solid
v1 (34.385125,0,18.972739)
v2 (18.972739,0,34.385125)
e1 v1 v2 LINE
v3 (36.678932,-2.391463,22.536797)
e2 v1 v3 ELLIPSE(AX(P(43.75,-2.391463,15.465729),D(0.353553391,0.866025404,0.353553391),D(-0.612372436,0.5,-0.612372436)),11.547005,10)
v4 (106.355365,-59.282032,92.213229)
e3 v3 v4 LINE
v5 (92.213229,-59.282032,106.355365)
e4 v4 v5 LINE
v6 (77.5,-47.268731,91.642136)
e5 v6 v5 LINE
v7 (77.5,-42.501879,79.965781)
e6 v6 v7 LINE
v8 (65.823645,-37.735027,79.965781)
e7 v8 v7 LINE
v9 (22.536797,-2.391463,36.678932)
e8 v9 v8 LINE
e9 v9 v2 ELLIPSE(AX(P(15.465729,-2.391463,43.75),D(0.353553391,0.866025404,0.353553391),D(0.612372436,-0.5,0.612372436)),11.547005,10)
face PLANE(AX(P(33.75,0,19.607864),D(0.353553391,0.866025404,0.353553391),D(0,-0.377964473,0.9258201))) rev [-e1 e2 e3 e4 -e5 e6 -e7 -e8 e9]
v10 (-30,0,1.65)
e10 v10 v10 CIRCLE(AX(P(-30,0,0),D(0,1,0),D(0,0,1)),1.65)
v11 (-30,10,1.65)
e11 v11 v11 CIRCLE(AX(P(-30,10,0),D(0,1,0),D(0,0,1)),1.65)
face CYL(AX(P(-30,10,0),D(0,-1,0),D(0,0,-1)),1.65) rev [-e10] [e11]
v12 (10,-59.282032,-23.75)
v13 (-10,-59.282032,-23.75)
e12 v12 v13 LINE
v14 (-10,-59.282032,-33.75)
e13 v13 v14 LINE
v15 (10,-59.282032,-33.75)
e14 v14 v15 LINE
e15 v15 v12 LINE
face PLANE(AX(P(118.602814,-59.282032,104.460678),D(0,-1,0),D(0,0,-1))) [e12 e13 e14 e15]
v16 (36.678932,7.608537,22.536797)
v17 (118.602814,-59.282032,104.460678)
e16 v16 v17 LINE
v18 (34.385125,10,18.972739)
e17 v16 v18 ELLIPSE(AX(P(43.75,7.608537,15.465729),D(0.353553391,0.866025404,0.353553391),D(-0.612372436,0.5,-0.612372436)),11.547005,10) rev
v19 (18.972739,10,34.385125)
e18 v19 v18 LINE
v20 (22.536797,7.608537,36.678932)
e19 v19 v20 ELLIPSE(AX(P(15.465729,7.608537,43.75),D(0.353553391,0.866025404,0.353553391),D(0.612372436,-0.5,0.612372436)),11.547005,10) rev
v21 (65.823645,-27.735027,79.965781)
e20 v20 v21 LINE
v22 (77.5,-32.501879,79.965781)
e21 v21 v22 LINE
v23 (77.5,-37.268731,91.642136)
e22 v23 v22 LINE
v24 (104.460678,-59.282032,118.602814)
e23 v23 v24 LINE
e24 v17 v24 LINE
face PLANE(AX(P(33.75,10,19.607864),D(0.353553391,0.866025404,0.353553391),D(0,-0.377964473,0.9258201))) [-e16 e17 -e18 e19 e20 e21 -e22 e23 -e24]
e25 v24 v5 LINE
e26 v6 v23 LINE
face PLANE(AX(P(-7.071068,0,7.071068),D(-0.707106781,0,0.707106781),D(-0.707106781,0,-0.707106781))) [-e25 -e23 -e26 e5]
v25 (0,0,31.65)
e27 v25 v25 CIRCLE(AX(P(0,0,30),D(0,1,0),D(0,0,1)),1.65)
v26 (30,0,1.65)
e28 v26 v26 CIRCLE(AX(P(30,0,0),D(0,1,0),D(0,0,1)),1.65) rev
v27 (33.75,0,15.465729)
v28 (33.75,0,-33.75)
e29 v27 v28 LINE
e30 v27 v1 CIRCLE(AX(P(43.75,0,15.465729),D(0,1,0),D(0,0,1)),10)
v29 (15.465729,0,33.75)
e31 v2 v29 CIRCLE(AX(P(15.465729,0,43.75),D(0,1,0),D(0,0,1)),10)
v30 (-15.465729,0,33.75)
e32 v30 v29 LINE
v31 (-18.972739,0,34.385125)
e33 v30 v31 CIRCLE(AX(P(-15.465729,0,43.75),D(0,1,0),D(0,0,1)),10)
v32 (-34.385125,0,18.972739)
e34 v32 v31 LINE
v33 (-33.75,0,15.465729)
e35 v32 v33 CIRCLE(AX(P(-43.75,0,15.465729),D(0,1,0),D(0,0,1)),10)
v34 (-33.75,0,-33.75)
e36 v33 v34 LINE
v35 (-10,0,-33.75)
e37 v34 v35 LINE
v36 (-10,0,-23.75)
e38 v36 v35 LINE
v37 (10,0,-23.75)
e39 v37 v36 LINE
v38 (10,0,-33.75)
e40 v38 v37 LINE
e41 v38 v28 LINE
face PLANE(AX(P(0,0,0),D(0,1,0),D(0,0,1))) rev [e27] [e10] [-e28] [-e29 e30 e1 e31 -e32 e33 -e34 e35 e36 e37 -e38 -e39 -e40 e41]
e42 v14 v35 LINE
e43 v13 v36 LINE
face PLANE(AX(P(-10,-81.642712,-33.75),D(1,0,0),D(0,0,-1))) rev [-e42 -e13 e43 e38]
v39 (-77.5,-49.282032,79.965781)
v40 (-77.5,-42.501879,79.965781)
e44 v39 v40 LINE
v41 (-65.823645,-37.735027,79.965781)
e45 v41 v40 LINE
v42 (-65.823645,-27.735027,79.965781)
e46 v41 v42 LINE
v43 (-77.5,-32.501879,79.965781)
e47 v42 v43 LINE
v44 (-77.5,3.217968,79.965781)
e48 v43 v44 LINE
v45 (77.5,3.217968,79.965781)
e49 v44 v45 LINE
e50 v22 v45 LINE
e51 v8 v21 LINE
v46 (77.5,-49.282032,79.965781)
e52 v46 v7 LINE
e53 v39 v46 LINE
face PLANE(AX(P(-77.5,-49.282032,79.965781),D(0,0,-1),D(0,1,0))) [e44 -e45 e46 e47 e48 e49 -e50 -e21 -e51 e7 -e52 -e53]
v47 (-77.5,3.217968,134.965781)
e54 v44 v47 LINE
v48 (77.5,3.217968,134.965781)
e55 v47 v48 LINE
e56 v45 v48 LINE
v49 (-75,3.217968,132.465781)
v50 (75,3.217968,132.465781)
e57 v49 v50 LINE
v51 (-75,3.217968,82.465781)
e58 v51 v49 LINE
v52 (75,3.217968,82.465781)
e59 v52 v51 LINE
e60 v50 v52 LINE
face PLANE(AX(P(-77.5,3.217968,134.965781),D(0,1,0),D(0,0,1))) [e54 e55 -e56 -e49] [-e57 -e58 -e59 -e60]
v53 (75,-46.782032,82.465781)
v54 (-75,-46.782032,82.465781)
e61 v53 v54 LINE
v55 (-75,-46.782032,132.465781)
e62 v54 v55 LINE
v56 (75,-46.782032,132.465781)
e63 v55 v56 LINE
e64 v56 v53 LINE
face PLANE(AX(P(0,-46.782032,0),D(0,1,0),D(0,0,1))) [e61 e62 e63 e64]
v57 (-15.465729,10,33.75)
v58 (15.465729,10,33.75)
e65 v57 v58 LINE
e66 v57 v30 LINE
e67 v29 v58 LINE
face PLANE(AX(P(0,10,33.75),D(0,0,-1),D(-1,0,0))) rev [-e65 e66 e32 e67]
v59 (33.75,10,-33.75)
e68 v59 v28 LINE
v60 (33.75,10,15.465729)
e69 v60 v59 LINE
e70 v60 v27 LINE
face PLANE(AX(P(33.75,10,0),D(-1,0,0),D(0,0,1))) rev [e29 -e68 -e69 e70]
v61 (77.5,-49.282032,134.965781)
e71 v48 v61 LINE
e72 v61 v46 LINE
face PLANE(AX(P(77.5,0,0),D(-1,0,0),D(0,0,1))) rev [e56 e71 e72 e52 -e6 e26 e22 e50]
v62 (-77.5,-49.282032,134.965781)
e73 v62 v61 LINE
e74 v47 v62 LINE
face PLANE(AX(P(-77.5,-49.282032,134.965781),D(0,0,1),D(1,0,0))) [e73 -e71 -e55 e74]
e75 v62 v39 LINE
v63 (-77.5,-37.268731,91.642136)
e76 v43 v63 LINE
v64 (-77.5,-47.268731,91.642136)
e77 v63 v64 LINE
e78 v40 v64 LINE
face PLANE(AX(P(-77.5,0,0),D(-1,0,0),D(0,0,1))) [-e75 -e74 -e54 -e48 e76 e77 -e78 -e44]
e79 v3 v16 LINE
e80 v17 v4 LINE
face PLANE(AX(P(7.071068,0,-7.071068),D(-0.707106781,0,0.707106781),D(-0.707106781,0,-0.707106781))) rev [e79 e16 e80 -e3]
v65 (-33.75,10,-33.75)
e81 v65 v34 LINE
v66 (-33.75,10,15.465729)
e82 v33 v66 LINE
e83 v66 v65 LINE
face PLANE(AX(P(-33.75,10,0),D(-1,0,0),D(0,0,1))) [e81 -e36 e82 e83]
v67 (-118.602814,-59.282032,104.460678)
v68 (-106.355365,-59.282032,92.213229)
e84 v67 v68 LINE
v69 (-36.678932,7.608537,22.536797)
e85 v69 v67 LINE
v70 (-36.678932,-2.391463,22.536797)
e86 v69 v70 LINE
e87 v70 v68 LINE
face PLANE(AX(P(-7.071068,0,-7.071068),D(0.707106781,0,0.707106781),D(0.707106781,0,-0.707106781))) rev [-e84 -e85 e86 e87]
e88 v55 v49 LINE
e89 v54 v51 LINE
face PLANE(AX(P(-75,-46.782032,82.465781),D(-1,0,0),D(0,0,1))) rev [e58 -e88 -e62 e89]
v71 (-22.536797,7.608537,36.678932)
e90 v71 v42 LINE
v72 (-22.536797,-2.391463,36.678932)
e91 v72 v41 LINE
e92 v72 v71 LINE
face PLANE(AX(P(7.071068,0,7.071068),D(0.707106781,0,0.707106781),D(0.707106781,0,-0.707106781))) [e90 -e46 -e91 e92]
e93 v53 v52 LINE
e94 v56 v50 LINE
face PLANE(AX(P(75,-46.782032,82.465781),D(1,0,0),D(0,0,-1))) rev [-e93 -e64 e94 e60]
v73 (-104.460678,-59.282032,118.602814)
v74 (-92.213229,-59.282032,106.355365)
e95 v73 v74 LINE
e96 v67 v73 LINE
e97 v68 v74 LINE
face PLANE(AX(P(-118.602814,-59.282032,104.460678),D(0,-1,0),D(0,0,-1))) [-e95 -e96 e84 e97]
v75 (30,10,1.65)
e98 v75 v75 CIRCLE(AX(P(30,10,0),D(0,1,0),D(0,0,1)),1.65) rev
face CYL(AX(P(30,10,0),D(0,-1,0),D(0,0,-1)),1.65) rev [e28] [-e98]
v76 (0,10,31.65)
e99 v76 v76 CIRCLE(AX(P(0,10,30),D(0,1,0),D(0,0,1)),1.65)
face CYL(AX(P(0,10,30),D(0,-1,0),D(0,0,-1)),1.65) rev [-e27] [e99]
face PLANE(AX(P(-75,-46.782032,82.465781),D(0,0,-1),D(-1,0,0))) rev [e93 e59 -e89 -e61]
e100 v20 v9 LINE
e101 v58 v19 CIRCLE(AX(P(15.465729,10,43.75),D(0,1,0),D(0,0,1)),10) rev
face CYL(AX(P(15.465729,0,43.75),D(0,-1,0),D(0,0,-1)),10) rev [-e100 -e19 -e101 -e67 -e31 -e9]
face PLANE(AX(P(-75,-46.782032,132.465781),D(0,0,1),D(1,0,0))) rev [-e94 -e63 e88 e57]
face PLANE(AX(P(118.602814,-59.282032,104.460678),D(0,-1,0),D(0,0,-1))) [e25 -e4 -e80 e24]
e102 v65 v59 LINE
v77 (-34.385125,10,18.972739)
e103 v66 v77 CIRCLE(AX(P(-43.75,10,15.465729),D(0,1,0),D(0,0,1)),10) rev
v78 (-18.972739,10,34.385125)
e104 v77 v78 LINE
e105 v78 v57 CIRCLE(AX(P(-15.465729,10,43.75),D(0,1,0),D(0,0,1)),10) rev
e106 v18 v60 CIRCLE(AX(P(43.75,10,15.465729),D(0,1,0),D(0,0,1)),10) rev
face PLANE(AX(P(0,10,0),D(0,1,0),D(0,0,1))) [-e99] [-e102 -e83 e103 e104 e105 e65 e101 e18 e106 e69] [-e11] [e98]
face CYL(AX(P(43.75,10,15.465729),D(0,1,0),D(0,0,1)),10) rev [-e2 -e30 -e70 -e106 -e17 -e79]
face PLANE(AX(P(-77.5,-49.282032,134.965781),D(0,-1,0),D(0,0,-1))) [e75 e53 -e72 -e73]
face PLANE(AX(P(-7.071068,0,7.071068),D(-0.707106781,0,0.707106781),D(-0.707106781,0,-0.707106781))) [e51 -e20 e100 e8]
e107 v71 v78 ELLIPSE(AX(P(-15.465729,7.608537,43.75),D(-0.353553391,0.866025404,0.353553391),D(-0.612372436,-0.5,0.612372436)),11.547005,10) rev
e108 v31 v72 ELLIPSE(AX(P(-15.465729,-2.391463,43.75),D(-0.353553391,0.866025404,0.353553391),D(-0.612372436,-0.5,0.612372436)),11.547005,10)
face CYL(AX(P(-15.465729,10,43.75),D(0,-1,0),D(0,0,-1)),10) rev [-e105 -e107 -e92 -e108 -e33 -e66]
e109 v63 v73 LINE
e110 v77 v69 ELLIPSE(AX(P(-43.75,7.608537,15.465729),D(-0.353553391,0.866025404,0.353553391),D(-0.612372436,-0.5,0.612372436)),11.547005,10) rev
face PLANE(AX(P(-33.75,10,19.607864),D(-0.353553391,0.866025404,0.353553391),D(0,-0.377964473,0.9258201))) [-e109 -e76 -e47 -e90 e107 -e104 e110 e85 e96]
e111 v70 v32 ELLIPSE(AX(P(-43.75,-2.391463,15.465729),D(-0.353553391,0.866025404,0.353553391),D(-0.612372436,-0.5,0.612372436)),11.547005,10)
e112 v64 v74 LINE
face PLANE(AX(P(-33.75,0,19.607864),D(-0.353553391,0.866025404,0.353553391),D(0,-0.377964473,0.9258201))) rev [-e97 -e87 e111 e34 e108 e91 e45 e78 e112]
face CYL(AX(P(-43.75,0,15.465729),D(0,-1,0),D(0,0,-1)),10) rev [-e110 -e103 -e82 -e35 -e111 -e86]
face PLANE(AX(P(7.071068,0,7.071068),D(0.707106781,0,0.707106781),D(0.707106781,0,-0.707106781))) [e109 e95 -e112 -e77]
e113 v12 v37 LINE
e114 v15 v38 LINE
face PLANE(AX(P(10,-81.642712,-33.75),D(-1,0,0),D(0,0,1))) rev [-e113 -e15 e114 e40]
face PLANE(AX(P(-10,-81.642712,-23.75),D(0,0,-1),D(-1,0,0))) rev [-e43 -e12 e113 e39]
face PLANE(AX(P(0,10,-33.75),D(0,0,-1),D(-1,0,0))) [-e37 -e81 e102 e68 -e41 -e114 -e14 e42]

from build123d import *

# Parameters (mm, degrees)
SKETCH2_W                = 67.5
SKETCH2_H                = 67.5
SKETCH2_R                = 1.65
BOSS_EXTRUDE3_DEPTH      = 10
BOSS_EXTRUDE6_DEPTH      = 10
CUT_EXTRUDE2_DEPTH       = 10
CUT_EXTRUDE3_DEPTH       = 10
SKETCH13_W               = 20
SKETCH13_H               = 10
BOSS_EXTRUDE8_DEPTH      = 59.282032303
BOSS_EXTRUDE9_DEPTH      = 77.5
BOSS_EXTRUDE9_DEPTH_BACK = 77.5
SKETCH14_W               = 55
SKETCH14_H               = 52.5
SKETCH15_W               = 150
SKETCH15_H               = 50
CUT_EXTRUDE4_DEPTH       = 50
FILLET1_R                = 10


with BuildPart() as part:
    # Sketch2 → Boss-Extrude3 (new body)
    with BuildSketch(Plane(origin=(0, 0, 0), x_dir=(1, 0, 0), z_dir=(0, 1, 0))):
        Rectangle(SKETCH2_W, SKETCH2_H)
        with Locations(Location((-30, 0, 0), (0, 0, 270))):
            Circle(SKETCH2_R, mode=Mode.SUBTRACT)
        with Locations(Location((30, 0, 0), (0, 0, 270))):
            Circle(SKETCH2_R, mode=Mode.SUBTRACT)
        with Locations(Location((0, -30, 0), (0, 0, 270))):
            Circle(SKETCH2_R, mode=Mode.SUBTRACT)
    extrude(amount=BOSS_EXTRUDE3_DEPTH)


with BuildPart() as body_2:
    # Sketch5 → Boss-Extrude6 (new, symmetric)
    with BuildSketch(Plane(origin=(0, 0, 0), x_dir=(0.7071067811865476, 0, -0.7071067811865476), z_dir=(0.7071067811865476, 0, 0.7071067811865476))):
        Polygon((-37.72970773, 10), (-157.72970773, -59.282032303), (-140.409199654, -59.282032303), (-37.72970773, 0), align=None)
    boss_extrude6 = extrude(amount=BOSS_EXTRUDE6_DEPTH, both=True)


with BuildPart() as part_1:
    add(part.part)

    # Mirror3: Boss-Extrude6 across plane
    add(boss_extrude6.mirror(Plane(origin=(0, 0, 0), x_dir=(0, 0, 1), z_dir=(1, 0, 0))))

    # Sketch11 → Cut-Extrude2 (cut)
    with BuildSketch(Plane(origin=(9.731595226, 23.837442686, 9.731595226), x_dir=(0.9259415151999266, -0.2703581015304675, -0.2637021186227093), z_dir=(0.35355339059327223, 0.8660254037844399, 0.3535533905932725))):
        Polygon((6.552208132, -28.687416212), (23.376309745, -17.873092151), (23.376309745, -36.367082054), align=None)
    extrude(amount=CUT_EXTRUDE2_DEPTH, mode=Mode.SUBTRACT)

    # Sketch12 → Cut-Extrude3 (cut)
    with BuildSketch(Plane(origin=(-9.731595226, 23.837442686, 9.731595226), x_dir=(0.9259415151999266, 0.2703581015304675, 0.2637021186227093), z_dir=(-0.35355339059327223, 0.8660254037844399, 0.3535533905932725))):
        Polygon((-98.300144639, -134.433887296), (-81.476043026, -145.248211357), (-6.552208132, -28.687416212), (-23.376309745, -17.873092151), align=None)
    extrude(amount=CUT_EXTRUDE3_DEPTH, mode=Mode.SUBTRACT)

    # Sketch13 → Boss-Extrude8 (add)
    with BuildSketch(Plane.XZ):
        with Locations((0, -28.75)):
            Rectangle(SKETCH13_W, SKETCH13_H)
    extrude(amount=BOSS_EXTRUDE8_DEPTH)

    add(body_2.part)  # Boss-Extrude9 merges body 2
    # Sketch14 → Boss-Extrude9 (add, two sides: drawn at the far end of the back side and taken through both)
    with BuildSketch(Plane(origin=(0, 0, 0), x_dir=(0, 0, -1), z_dir=(1, 0, 0)).offset(-BOSS_EXTRUDE9_DEPTH_BACK)):
        with Locations((-107.465780691, -23.032032303)):
            Rectangle(SKETCH14_W, SKETCH14_H)
    extrude(amount=BOSS_EXTRUDE9_DEPTH + BOSS_EXTRUDE9_DEPTH_BACK)

    # Sketch15 → Cut-Extrude4 (cut)
    with BuildSketch(Plane(origin=(0, 3.217967697, 0), x_dir=(1, 0, 0), z_dir=(0, 1, 0))):
        with Locations((0, -107.465780691)):
            Rectangle(SKETCH15_W, SKETCH15_H)
    extrude(amount=-CUT_EXTRUDE4_DEPTH, mode=Mode.SUBTRACT)

    # Fillet1
    # the kernel refuses this fillet: 10 mm, written as the material it adds along each edge
    with BuildSketch(Plane(origin=(-19.607864376, 0, 33.75), x_dir=(-0.7071067811865471, 0, 0.7071067811865479), z_dir=(0, 1, 0))) as fillet1_piece_1_section:
        with BuildLine():
            CenterArc((FILLET1_R * 0.414213562373, FILLET1_R), FILLET1_R, 225, 45)
            Line((-FILLET1_R * 0.292893218813, FILLET1_R * 0.292893218813), (0, 0))
            Line((0, 0), (FILLET1_R * 0.414213562373, 0))
        make_face()
    fillet1_piece_1 = extrude(amount=10, mode=Mode.PRIVATE)
    fillet1_piece_1 = split(fillet1_piece_1, bisect_by=Plane(origin=(-17.351540007, 0.866448536, 33.883967569), z_dir=(0.3535533905932724, -0.8660254037844399, -0.3535533905932724)), keep=Keep.TOP, mode=Mode.PRIVATE)
    add(fillet1_piece_1)
    with BuildSketch(Plane(origin=(-19.607864376, -10.355339059, 33.75), x_dir=(-0.7071067811865475, 0, 0.7071067811865475), z_dir=(0, 1, 0))) as fillet1_piece_2_section:
        with BuildLine():
            CenterArc((FILLET1_R * 0.414213562373, FILLET1_R), FILLET1_R, 225, 45)
            Line((-FILLET1_R * 0.292893218813, FILLET1_R * 0.292893218813), (0, 0))
            Line((0, 0), (FILLET1_R * 0.414213562373, 0))
        make_face()
    fillet1_piece_2 = extrude(amount=20.355339059, mode=Mode.PRIVATE)
    fillet1_piece_2 = split(fillet1_piece_2, bisect_by=Plane(origin=(-21.014554375, -1.158148748, 35.180183481), z_dir=(-0.3535533905932724, 0.8660254037844399, 0.3535533905932724)), keep=Keep.TOP, mode=Mode.PRIVATE)
    fillet1_piece_2 = split(fillet1_piece_2, bisect_by=Plane(origin=(-21.217188194, 0, 35.382817301), z_dir=(0, -1, 0)), keep=Keep.TOP, mode=Mode.PRIVATE)
    add(fillet1_piece_2)
    with BuildSketch(Plane(origin=(-19.607864376, 0, 33.75), x_dir=(-0.7071067811865471, 0, 0.7071067811865479), z_dir=(0, 1, 0))) as fillet1_piece_3_section:
        with BuildLine():
            CenterArc((FILLET1_R * 0.414213562373, FILLET1_R), FILLET1_R, 225, 45)
            Line((-FILLET1_R * 0.292893218813, FILLET1_R * 0.292893218813), (0, 0))
            Line((0, 0), (FILLET1_R * 0.414213562373, 0))
        make_face()
    fillet1_piece_3 = extrude(amount=10, mode=Mode.PRIVATE)
    fillet1_piece_3 = split(fillet1_piece_3, bisect_by=Plane(origin=(-20.84268256, 8.638165162, 35.850982283), z_dir=(0.3535533905932724, -0.8660254037844399, -0.3535533905932724)), keep=Keep.TOP, mode=Mode.PRIVATE)
    fillet1_piece_3 = split(fillet1_piece_3, bisect_by=Plane(origin=(-17.780820381, 1.138165162, 32.789120105), z_dir=(-0.3535533905932724, 0.8660254037844399, 0.3535533905932724)), keep=Keep.TOP, mode=Mode.PRIVATE)
    add(fillet1_piece_3)
    with BuildSketch(Plane(origin=(33.75, -10.355339059, 19.607864376), x_dir=(0, 0, -1), z_dir=(0, 1, 0))) as fillet1_piece_4_section:
        with BuildLine():
            CenterArc((FILLET1_R * 0.414213562373, -FILLET1_R), FILLET1_R, 90, 45)
            Line((-FILLET1_R * 0.292893218813, -FILLET1_R * 0.292893218813), (0, 0))
            Line((0, 0), (FILLET1_R * 0.414213562373, 0))
        make_face()
    fillet1_piece_4 = extrude(amount=20.355339059, mode=Mode.PRIVATE)
    fillet1_piece_4 = split(fillet1_piece_4, bisect_by=Plane(origin=(35.382817302, 0, 21.217188197), z_dir=(0, -1, 0)), keep=Keep.TOP, mode=Mode.PRIVATE)
    fillet1_piece_4 = split(fillet1_piece_4, bisect_by=Plane(origin=(35.180183482, -1.15814875, 21.014554377), z_dir=(0.35355339059327234, 0.8660254037844399, 0.35355339059327234)), keep=Keep.TOP, mode=Mode.PRIVATE)
    add(fillet1_piece_4)
    with BuildSketch(Plane(origin=(33.75, 0, 19.607864376), x_dir=(0, 0, -1), z_dir=(0, 1, 0))) as fillet1_piece_5_section:
        with BuildLine():
            CenterArc((FILLET1_R * 0.414213562373, -FILLET1_R), FILLET1_R, 90, 45)
            Line((-FILLET1_R * 0.292893218813, -FILLET1_R * 0.292893218813), (0, 0))
            Line((0, 0), (FILLET1_R * 0.414213562373, 0))
        make_face()
    fillet1_piece_5 = extrude(amount=10, mode=Mode.PRIVATE)
    fillet1_piece_5 = split(fillet1_piece_5, bisect_by=Plane(origin=(33.883967571, 0.866448534, 17.351540009), z_dir=(-0.35355339059327234, -0.8660254037844399, -0.35355339059327234)), keep=Keep.TOP, mode=Mode.PRIVATE)
    add(fillet1_piece_5)
    with BuildSketch(Plane(origin=(33.75, 0, 19.607864376), x_dir=(0, 0, -1), z_dir=(0, 1, 0))) as fillet1_piece_6_section:
        with BuildLine():
            CenterArc((FILLET1_R * 0.414213562373, -FILLET1_R), FILLET1_R, 90, 45)
            Line((-FILLET1_R * 0.292893218813, -FILLET1_R * 0.292893218813), (0, 0))
            Line((0, 0), (FILLET1_R * 0.414213562373, 0))
        make_face()
    fillet1_piece_6 = extrude(amount=10, mode=Mode.PRIVATE)
    fillet1_piece_6 = split(fillet1_piece_6, bisect_by=Plane(origin=(35.850982284, 8.638165162, 20.842682559), z_dir=(-0.3535533905932724, -0.8660254037844399, -0.3535533905932724)), keep=Keep.TOP, mode=Mode.PRIVATE)
    fillet1_piece_6 = split(fillet1_piece_6, bisect_by=Plane(origin=(32.789120106, 1.138165162, 17.780820381), z_dir=(0.35355339059327234, 0.8660254037844399, 0.35355339059327234)), keep=Keep.TOP, mode=Mode.PRIVATE)
    add(fillet1_piece_6)
    with BuildSketch(Plane(origin=(-33.75, 0, 19.607864376), x_dir=(-0.7071067811865479, 0, 0.7071067811865471), z_dir=(0, 1, 0))) as fillet1_piece_7_section:
        with BuildLine():
            CenterArc((FILLET1_R * 0.414213562373, -FILLET1_R), FILLET1_R, 90, 45)
            Line((-FILLET1_R * 0.292893218813, -FILLET1_R * 0.292893218813), (0, 0))
            Line((0, 0), (FILLET1_R * 0.414213562373, 0))
        make_face()
    fillet1_piece_7 = extrude(amount=10, mode=Mode.PRIVATE)
    fillet1_piece_7 = split(fillet1_piece_7, bisect_by=Plane(origin=(-33.883967569, 0.866448536, 17.351540007), z_dir=(0.3535533905932724, -0.8660254037844399, -0.3535533905932724)), keep=Keep.TOP, mode=Mode.PRIVATE)
    add(fillet1_piece_7)
    with BuildSketch(Plane(origin=(-33.75, -10.355339059, 19.607864376), x_dir=(-0.7071067811865475, 0, 0.7071067811865475), z_dir=(0, 1, 0))) as fillet1_piece_8_section:
        with BuildLine():
            CenterArc((FILLET1_R * 0.414213562373, -FILLET1_R), FILLET1_R, 90, 45)
            Line((-FILLET1_R * 0.292893218813, -FILLET1_R * 0.292893218813), (0, 0))
            Line((0, 0), (FILLET1_R * 0.414213562373, 0))
        make_face()
    fillet1_piece_8 = extrude(amount=20.355339059, mode=Mode.PRIVATE)
    fillet1_piece_8 = split(fillet1_piece_8, bisect_by=Plane(origin=(-35.180183481, -1.158148748, 21.014554375), z_dir=(-0.3535533905932724, 0.8660254037844399, 0.3535533905932724)), keep=Keep.TOP, mode=Mode.PRIVATE)
    fillet1_piece_8 = split(fillet1_piece_8, bisect_by=Plane(origin=(-35.382817301, 0, 21.217188194), z_dir=(0, -1, 0)), keep=Keep.TOP, mode=Mode.PRIVATE)
    add(fillet1_piece_8)
    with BuildSketch(Plane(origin=(-33.75, 0, 19.607864376), x_dir=(-0.7071067811865479, 0, 0.7071067811865471), z_dir=(0, 1, 0))) as fillet1_piece_9_section:
        with BuildLine():
            CenterArc((FILLET1_R * 0.414213562373, -FILLET1_R), FILLET1_R, 90, 45)
            Line((-FILLET1_R * 0.292893218813, -FILLET1_R * 0.292893218813), (0, 0))
            Line((0, 0), (FILLET1_R * 0.414213562373, 0))
        make_face()
    fillet1_piece_9 = extrude(amount=10, mode=Mode.PRIVATE)
    fillet1_piece_9 = split(fillet1_piece_9, bisect_by=Plane(origin=(-35.850982283, 8.638165162, 20.84268256), z_dir=(0.3535533905932724, -0.8660254037844399, -0.3535533905932724)), keep=Keep.TOP, mode=Mode.PRIVATE)
    fillet1_piece_9 = split(fillet1_piece_9, bisect_by=Plane(origin=(-32.789120105, 1.138165162, 17.780820381), z_dir=(-0.3535533905932724, 0.8660254037844399, 0.3535533905932724)), keep=Keep.TOP, mode=Mode.PRIVATE)
    add(fillet1_piece_9)
    with BuildSketch(Plane(origin=(19.607864376, -10.355339059, 33.75), x_dir=(-1, 0, 0), z_dir=(0, 1, 0))) as fillet1_piece_10_section:
        with BuildLine():
            CenterArc((FILLET1_R * 0.414213562373, FILLET1_R), FILLET1_R, 225, 45)
            Line((-FILLET1_R * 0.292893218813, FILLET1_R * 0.292893218813), (0, 0))
            Line((0, 0), (FILLET1_R * 0.414213562373, 0))
        make_face()
    fillet1_piece_10 = extrude(amount=20.355339059, mode=Mode.PRIVATE)
    fillet1_piece_10 = split(fillet1_piece_10, bisect_by=Plane(origin=(21.217188197, 0, 35.382817302), z_dir=(0, -1, 0)), keep=Keep.TOP, mode=Mode.PRIVATE)
    fillet1_piece_10 = split(fillet1_piece_10, bisect_by=Plane(origin=(21.014554377, -1.15814875, 35.180183482), z_dir=(0.35355339059327234, 0.8660254037844399, 0.35355339059327234)), keep=Keep.TOP, mode=Mode.PRIVATE)
    add(fillet1_piece_10)
    with BuildSketch(Plane(origin=(19.607864376, 0, 33.75), x_dir=(-1, 0, 0), z_dir=(0, 1, 0))) as fillet1_piece_11_section:
        with BuildLine():
            CenterArc((FILLET1_R * 0.414213562373, FILLET1_R), FILLET1_R, 225, 45)
            Line((-FILLET1_R * 0.292893218813, FILLET1_R * 0.292893218813), (0, 0))
            Line((0, 0), (FILLET1_R * 0.414213562373, 0))
        make_face()
    fillet1_piece_11 = extrude(amount=10, mode=Mode.PRIVATE)
    fillet1_piece_11 = split(fillet1_piece_11, bisect_by=Plane(origin=(17.351540009, 0.866448534, 33.883967571), z_dir=(-0.35355339059327234, -0.8660254037844399, -0.35355339059327234)), keep=Keep.TOP, mode=Mode.PRIVATE)
    add(fillet1_piece_11)
    with BuildSketch(Plane(origin=(19.607864376, 0, 33.75), x_dir=(-1, 0, 0), z_dir=(0, 1, 0))) as fillet1_piece_12_section:
        with BuildLine():
            CenterArc((FILLET1_R * 0.414213562373, FILLET1_R), FILLET1_R, 225, 45)
            Line((-FILLET1_R * 0.292893218813, FILLET1_R * 0.292893218813), (0, 0))
            Line((0, 0), (FILLET1_R * 0.414213562373, 0))
        make_face()
    fillet1_piece_12 = extrude(amount=10, mode=Mode.PRIVATE)
    fillet1_piece_12 = split(fillet1_piece_12, bisect_by=Plane(origin=(20.842682559, 8.638165162, 35.850982284), z_dir=(-0.3535533905932724, -0.8660254037844399, -0.3535533905932724)), keep=Keep.TOP, mode=Mode.PRIVATE)
    fillet1_piece_12 = split(fillet1_piece_12, bisect_by=Plane(origin=(17.780820381, 1.138165162, 32.789120106), z_dir=(0.35355339059327234, 0.8660254037844399, 0.35355339059327234)), keep=Keep.TOP, mode=Mode.PRIVATE)
    add(fillet1_piece_12)


solid = part_1.part
